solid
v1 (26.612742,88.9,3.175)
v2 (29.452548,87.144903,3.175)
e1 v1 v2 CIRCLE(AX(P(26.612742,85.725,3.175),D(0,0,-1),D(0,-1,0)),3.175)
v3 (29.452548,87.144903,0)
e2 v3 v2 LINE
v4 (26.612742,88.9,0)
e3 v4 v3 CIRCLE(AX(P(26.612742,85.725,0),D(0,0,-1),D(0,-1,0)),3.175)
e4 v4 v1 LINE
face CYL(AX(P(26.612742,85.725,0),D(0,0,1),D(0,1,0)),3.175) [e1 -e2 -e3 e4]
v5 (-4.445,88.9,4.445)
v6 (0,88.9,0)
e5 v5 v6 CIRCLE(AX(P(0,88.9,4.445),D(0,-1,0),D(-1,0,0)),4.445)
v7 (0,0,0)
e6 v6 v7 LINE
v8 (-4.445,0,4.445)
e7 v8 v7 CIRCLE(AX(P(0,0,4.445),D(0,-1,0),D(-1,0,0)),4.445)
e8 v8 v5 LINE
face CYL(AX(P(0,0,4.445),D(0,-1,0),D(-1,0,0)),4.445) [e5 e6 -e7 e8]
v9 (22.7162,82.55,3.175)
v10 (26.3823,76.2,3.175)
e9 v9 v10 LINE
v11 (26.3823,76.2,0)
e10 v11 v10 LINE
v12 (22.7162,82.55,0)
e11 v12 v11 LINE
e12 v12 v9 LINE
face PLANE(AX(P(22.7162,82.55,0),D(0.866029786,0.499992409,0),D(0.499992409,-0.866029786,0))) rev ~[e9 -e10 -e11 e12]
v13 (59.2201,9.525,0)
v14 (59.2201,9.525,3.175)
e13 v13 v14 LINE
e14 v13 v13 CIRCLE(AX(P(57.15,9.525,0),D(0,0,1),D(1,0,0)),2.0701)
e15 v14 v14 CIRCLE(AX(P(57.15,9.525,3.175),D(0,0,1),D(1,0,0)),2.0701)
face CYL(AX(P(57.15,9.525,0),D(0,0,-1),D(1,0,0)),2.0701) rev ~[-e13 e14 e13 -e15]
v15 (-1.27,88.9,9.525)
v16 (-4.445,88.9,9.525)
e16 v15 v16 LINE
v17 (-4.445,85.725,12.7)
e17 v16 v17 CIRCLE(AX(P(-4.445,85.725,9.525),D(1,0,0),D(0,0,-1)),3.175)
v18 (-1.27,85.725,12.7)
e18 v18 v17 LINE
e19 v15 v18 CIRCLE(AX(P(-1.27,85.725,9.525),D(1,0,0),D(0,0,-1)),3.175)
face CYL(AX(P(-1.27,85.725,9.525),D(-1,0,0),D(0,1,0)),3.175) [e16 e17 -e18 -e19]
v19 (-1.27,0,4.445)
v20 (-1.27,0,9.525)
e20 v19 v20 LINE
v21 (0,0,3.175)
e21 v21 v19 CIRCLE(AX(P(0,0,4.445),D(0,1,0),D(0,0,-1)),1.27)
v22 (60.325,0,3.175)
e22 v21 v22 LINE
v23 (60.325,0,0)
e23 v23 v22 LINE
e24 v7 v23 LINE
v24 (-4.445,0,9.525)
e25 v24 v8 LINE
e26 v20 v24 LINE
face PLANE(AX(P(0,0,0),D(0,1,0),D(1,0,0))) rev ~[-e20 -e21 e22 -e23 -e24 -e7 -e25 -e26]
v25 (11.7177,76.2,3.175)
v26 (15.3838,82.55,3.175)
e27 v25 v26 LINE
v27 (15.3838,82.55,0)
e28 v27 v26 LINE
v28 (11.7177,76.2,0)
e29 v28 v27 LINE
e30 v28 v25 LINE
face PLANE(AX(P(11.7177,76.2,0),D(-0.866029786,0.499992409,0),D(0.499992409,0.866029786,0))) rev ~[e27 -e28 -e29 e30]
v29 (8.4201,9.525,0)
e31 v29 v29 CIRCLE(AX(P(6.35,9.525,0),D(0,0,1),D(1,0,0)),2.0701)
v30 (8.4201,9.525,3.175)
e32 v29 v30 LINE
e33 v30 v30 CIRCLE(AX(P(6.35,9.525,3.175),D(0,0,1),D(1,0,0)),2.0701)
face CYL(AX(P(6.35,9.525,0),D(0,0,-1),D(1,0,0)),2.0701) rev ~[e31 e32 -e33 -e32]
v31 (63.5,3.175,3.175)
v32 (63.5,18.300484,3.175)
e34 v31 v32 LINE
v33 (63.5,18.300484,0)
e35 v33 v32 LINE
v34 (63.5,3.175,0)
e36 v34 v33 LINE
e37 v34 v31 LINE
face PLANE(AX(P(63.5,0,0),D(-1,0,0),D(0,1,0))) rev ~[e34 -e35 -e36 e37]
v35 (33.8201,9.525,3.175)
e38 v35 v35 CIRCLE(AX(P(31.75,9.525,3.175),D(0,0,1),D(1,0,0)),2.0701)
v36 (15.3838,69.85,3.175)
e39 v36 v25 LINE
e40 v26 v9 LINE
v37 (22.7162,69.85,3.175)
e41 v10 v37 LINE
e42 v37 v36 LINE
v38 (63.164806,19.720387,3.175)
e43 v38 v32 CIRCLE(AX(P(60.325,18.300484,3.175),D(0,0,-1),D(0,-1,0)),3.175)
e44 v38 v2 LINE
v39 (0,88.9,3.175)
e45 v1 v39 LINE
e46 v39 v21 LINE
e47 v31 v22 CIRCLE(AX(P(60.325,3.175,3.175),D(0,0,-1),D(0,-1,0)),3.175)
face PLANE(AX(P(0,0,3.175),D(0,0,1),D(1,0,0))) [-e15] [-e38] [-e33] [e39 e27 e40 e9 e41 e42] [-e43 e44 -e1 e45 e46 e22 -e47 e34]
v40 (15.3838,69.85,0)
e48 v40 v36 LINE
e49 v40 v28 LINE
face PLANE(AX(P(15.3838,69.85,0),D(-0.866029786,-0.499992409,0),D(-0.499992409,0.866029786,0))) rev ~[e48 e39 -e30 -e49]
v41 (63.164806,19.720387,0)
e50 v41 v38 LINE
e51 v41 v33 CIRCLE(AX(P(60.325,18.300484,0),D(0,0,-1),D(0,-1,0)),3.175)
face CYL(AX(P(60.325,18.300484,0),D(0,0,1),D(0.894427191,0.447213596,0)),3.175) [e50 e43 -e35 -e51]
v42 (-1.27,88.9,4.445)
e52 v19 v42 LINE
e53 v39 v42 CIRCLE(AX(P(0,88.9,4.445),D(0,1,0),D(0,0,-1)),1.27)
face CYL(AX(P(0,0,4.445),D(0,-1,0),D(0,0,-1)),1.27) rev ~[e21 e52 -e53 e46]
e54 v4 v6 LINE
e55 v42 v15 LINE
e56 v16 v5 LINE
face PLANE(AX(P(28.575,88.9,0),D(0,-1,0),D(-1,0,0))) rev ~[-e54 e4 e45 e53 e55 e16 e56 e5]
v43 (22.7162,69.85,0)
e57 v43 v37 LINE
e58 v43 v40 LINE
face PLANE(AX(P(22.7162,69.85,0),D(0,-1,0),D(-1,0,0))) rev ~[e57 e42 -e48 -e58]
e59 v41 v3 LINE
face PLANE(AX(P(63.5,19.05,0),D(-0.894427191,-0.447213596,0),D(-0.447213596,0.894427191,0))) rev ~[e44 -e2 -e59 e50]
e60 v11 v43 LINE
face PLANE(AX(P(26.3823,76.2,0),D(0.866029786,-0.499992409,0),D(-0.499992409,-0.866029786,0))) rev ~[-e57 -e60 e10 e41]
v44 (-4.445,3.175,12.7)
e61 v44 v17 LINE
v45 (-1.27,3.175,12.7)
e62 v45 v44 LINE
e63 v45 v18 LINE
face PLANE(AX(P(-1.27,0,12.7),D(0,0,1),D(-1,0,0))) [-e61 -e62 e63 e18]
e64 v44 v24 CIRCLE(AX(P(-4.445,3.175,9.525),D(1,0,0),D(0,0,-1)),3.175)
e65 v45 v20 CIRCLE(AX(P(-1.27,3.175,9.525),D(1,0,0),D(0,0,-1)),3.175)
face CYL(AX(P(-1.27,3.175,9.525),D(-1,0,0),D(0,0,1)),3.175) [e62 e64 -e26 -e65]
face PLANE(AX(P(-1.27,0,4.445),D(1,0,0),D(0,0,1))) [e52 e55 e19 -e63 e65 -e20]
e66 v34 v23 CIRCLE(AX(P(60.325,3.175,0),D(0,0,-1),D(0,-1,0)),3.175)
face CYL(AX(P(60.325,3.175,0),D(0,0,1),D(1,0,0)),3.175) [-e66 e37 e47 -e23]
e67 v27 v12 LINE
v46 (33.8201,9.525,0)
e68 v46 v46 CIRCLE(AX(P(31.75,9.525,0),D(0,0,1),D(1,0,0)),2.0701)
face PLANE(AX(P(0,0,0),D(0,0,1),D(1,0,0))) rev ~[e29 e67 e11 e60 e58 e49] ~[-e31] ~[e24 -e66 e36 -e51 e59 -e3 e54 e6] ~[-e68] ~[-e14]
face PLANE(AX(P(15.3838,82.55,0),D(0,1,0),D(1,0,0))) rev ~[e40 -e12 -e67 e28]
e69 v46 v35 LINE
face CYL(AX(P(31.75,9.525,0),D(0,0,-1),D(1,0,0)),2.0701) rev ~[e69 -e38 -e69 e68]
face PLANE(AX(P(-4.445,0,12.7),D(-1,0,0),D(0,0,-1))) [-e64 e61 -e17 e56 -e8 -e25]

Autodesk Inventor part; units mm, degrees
ref_plane "YZ Plane" through (0, 0, 0) normal (1, 0, 0) x (0, 1, 0)
ref_plane "XZ Plane" through (0, 0, 0) normal (0, 1, 0) x (-1, 0, 0)
ref_plane "XY Plane" through (0, 0, 0) normal (0, 0, 1) x (1, 0, 0)
sketch "Sketch1" plane through (0, 0, 0) normal (0, 0, 1) x (1, 0, 0)
  line L0 (0, 0) -> (63.5, 0)
  line L1 (63.5, 0) -> (63.5, 19.05)
  line L2 (0, 88.9) -> (0, 0)
  circle A0 centre (6.35, 9.525) radius 2.0701
  circle A1 centre (31.75, 9.525) radius 2.0701
  circle A2 centre (57.15, 9.525) radius 2.0701
  line L3 (63.5, 19.05) -> (28.575, 88.9)
  line L4 (28.575, 88.9) -> (0, 88.9)
  line L5 (22.7162, 82.55) -> (26.3823, 76.2)
  line L6 (26.3823, 76.2) -> (22.7162, 69.85)
  line L7 (22.7162, 69.85) -> (15.3838, 69.85)
  line L8 (15.3838, 69.85) -> (11.7177, 76.2)
  line L9 (11.7177, 76.2) -> (15.3838, 82.55)
  line L10 (15.3838, 82.55) -> (22.7162, 82.55)
  point P0 (19.05, 76.2)
  dimension "d5" = 63.5
  dimension "d6" = 4.1402
  dimension "d7" = 6.35
  dimension "d8" = 9.525
  dimension "d24" = 25.4
  dimension "d29" = 88.9
  dimension "d30" = 19.05
  dimension "d31" = 28.575
  dimension "d32" = 12.7
  dimension "d34" = 19.05
  dimension "d35" = 12.7
extrude "Plate1" add sketch "Sketch1" along normal blind 3.175
sketch "Sketch3" plane through (-1.27, 0, 4.445) normal (-1, 0, 0) x (0, -1, 0)
  line L0 (-88.9, 0) -> (0, 0)
  line L1 (0, 0) -> (0, 8.255)
  line L2 (0, 8.255) -> (-88.9, 8.255)
  line L3 (-88.9, 8.255) -> (-88.9, 0)
edge flange "Flange2" height 12.7 angle 90 thickness 3.175 bend radius 1.27 thickness toward (-1, 0, 0) relief tear relief width 3.175 relief depth 1.5875 edges at (0, 44.45, 3.175) wall of the first edge with corners at (-1.27, 88.9, 4.445) (-1.27, 0, 4.445) (-1.27, 0, 12.7) (-1.27, 88.9, 12.7)
bend "Bend2"
corner "Corner2"
fillet "Fillet1" radius 3.175 5 edges at (28.575, 88.9, 1.5875) (-2.8575, 0, 12.7) (63.5, 19.05, 1.5875) (63.5, 0, 1.5875) (-2.8575, 88.9, 12.7)
equation "\"d36\" = BendReliefWidth"
equation "\"d37\" = BendReliefDepth"
equation "\"d38\" = MinimumRemnant"
equation "\"d39\" = BendRadius"
equation "\"d43\" = CornerReliefSize"
equation "\"d44\" = GapSize"
equation "\"d45\" = JacobiRadiusSize"
equation "\"BendRadius\" = Thickness"
equation "\"BendReliefWidth\" = Thickness"
equation "\"BendReliefDepth\" = 0.5 * Thickness"
equation "\"CornerReliefSize\" = 4 * Thickness"
equation "\"MinimumRemnant\" = 2 * Thickness"
equation "\"TransitionRadius\" = BendRadius"
equation "\"JacobiRadiusSize\" = BendRadius"
equation "\"GapSize\" = Thickness"
equation "\"d11\" = BendRadius"
equation "\"Thickness\" = 3.175"
properties part number "Spacer 3 (R-R) ipt" material "Aluminum 6061"
